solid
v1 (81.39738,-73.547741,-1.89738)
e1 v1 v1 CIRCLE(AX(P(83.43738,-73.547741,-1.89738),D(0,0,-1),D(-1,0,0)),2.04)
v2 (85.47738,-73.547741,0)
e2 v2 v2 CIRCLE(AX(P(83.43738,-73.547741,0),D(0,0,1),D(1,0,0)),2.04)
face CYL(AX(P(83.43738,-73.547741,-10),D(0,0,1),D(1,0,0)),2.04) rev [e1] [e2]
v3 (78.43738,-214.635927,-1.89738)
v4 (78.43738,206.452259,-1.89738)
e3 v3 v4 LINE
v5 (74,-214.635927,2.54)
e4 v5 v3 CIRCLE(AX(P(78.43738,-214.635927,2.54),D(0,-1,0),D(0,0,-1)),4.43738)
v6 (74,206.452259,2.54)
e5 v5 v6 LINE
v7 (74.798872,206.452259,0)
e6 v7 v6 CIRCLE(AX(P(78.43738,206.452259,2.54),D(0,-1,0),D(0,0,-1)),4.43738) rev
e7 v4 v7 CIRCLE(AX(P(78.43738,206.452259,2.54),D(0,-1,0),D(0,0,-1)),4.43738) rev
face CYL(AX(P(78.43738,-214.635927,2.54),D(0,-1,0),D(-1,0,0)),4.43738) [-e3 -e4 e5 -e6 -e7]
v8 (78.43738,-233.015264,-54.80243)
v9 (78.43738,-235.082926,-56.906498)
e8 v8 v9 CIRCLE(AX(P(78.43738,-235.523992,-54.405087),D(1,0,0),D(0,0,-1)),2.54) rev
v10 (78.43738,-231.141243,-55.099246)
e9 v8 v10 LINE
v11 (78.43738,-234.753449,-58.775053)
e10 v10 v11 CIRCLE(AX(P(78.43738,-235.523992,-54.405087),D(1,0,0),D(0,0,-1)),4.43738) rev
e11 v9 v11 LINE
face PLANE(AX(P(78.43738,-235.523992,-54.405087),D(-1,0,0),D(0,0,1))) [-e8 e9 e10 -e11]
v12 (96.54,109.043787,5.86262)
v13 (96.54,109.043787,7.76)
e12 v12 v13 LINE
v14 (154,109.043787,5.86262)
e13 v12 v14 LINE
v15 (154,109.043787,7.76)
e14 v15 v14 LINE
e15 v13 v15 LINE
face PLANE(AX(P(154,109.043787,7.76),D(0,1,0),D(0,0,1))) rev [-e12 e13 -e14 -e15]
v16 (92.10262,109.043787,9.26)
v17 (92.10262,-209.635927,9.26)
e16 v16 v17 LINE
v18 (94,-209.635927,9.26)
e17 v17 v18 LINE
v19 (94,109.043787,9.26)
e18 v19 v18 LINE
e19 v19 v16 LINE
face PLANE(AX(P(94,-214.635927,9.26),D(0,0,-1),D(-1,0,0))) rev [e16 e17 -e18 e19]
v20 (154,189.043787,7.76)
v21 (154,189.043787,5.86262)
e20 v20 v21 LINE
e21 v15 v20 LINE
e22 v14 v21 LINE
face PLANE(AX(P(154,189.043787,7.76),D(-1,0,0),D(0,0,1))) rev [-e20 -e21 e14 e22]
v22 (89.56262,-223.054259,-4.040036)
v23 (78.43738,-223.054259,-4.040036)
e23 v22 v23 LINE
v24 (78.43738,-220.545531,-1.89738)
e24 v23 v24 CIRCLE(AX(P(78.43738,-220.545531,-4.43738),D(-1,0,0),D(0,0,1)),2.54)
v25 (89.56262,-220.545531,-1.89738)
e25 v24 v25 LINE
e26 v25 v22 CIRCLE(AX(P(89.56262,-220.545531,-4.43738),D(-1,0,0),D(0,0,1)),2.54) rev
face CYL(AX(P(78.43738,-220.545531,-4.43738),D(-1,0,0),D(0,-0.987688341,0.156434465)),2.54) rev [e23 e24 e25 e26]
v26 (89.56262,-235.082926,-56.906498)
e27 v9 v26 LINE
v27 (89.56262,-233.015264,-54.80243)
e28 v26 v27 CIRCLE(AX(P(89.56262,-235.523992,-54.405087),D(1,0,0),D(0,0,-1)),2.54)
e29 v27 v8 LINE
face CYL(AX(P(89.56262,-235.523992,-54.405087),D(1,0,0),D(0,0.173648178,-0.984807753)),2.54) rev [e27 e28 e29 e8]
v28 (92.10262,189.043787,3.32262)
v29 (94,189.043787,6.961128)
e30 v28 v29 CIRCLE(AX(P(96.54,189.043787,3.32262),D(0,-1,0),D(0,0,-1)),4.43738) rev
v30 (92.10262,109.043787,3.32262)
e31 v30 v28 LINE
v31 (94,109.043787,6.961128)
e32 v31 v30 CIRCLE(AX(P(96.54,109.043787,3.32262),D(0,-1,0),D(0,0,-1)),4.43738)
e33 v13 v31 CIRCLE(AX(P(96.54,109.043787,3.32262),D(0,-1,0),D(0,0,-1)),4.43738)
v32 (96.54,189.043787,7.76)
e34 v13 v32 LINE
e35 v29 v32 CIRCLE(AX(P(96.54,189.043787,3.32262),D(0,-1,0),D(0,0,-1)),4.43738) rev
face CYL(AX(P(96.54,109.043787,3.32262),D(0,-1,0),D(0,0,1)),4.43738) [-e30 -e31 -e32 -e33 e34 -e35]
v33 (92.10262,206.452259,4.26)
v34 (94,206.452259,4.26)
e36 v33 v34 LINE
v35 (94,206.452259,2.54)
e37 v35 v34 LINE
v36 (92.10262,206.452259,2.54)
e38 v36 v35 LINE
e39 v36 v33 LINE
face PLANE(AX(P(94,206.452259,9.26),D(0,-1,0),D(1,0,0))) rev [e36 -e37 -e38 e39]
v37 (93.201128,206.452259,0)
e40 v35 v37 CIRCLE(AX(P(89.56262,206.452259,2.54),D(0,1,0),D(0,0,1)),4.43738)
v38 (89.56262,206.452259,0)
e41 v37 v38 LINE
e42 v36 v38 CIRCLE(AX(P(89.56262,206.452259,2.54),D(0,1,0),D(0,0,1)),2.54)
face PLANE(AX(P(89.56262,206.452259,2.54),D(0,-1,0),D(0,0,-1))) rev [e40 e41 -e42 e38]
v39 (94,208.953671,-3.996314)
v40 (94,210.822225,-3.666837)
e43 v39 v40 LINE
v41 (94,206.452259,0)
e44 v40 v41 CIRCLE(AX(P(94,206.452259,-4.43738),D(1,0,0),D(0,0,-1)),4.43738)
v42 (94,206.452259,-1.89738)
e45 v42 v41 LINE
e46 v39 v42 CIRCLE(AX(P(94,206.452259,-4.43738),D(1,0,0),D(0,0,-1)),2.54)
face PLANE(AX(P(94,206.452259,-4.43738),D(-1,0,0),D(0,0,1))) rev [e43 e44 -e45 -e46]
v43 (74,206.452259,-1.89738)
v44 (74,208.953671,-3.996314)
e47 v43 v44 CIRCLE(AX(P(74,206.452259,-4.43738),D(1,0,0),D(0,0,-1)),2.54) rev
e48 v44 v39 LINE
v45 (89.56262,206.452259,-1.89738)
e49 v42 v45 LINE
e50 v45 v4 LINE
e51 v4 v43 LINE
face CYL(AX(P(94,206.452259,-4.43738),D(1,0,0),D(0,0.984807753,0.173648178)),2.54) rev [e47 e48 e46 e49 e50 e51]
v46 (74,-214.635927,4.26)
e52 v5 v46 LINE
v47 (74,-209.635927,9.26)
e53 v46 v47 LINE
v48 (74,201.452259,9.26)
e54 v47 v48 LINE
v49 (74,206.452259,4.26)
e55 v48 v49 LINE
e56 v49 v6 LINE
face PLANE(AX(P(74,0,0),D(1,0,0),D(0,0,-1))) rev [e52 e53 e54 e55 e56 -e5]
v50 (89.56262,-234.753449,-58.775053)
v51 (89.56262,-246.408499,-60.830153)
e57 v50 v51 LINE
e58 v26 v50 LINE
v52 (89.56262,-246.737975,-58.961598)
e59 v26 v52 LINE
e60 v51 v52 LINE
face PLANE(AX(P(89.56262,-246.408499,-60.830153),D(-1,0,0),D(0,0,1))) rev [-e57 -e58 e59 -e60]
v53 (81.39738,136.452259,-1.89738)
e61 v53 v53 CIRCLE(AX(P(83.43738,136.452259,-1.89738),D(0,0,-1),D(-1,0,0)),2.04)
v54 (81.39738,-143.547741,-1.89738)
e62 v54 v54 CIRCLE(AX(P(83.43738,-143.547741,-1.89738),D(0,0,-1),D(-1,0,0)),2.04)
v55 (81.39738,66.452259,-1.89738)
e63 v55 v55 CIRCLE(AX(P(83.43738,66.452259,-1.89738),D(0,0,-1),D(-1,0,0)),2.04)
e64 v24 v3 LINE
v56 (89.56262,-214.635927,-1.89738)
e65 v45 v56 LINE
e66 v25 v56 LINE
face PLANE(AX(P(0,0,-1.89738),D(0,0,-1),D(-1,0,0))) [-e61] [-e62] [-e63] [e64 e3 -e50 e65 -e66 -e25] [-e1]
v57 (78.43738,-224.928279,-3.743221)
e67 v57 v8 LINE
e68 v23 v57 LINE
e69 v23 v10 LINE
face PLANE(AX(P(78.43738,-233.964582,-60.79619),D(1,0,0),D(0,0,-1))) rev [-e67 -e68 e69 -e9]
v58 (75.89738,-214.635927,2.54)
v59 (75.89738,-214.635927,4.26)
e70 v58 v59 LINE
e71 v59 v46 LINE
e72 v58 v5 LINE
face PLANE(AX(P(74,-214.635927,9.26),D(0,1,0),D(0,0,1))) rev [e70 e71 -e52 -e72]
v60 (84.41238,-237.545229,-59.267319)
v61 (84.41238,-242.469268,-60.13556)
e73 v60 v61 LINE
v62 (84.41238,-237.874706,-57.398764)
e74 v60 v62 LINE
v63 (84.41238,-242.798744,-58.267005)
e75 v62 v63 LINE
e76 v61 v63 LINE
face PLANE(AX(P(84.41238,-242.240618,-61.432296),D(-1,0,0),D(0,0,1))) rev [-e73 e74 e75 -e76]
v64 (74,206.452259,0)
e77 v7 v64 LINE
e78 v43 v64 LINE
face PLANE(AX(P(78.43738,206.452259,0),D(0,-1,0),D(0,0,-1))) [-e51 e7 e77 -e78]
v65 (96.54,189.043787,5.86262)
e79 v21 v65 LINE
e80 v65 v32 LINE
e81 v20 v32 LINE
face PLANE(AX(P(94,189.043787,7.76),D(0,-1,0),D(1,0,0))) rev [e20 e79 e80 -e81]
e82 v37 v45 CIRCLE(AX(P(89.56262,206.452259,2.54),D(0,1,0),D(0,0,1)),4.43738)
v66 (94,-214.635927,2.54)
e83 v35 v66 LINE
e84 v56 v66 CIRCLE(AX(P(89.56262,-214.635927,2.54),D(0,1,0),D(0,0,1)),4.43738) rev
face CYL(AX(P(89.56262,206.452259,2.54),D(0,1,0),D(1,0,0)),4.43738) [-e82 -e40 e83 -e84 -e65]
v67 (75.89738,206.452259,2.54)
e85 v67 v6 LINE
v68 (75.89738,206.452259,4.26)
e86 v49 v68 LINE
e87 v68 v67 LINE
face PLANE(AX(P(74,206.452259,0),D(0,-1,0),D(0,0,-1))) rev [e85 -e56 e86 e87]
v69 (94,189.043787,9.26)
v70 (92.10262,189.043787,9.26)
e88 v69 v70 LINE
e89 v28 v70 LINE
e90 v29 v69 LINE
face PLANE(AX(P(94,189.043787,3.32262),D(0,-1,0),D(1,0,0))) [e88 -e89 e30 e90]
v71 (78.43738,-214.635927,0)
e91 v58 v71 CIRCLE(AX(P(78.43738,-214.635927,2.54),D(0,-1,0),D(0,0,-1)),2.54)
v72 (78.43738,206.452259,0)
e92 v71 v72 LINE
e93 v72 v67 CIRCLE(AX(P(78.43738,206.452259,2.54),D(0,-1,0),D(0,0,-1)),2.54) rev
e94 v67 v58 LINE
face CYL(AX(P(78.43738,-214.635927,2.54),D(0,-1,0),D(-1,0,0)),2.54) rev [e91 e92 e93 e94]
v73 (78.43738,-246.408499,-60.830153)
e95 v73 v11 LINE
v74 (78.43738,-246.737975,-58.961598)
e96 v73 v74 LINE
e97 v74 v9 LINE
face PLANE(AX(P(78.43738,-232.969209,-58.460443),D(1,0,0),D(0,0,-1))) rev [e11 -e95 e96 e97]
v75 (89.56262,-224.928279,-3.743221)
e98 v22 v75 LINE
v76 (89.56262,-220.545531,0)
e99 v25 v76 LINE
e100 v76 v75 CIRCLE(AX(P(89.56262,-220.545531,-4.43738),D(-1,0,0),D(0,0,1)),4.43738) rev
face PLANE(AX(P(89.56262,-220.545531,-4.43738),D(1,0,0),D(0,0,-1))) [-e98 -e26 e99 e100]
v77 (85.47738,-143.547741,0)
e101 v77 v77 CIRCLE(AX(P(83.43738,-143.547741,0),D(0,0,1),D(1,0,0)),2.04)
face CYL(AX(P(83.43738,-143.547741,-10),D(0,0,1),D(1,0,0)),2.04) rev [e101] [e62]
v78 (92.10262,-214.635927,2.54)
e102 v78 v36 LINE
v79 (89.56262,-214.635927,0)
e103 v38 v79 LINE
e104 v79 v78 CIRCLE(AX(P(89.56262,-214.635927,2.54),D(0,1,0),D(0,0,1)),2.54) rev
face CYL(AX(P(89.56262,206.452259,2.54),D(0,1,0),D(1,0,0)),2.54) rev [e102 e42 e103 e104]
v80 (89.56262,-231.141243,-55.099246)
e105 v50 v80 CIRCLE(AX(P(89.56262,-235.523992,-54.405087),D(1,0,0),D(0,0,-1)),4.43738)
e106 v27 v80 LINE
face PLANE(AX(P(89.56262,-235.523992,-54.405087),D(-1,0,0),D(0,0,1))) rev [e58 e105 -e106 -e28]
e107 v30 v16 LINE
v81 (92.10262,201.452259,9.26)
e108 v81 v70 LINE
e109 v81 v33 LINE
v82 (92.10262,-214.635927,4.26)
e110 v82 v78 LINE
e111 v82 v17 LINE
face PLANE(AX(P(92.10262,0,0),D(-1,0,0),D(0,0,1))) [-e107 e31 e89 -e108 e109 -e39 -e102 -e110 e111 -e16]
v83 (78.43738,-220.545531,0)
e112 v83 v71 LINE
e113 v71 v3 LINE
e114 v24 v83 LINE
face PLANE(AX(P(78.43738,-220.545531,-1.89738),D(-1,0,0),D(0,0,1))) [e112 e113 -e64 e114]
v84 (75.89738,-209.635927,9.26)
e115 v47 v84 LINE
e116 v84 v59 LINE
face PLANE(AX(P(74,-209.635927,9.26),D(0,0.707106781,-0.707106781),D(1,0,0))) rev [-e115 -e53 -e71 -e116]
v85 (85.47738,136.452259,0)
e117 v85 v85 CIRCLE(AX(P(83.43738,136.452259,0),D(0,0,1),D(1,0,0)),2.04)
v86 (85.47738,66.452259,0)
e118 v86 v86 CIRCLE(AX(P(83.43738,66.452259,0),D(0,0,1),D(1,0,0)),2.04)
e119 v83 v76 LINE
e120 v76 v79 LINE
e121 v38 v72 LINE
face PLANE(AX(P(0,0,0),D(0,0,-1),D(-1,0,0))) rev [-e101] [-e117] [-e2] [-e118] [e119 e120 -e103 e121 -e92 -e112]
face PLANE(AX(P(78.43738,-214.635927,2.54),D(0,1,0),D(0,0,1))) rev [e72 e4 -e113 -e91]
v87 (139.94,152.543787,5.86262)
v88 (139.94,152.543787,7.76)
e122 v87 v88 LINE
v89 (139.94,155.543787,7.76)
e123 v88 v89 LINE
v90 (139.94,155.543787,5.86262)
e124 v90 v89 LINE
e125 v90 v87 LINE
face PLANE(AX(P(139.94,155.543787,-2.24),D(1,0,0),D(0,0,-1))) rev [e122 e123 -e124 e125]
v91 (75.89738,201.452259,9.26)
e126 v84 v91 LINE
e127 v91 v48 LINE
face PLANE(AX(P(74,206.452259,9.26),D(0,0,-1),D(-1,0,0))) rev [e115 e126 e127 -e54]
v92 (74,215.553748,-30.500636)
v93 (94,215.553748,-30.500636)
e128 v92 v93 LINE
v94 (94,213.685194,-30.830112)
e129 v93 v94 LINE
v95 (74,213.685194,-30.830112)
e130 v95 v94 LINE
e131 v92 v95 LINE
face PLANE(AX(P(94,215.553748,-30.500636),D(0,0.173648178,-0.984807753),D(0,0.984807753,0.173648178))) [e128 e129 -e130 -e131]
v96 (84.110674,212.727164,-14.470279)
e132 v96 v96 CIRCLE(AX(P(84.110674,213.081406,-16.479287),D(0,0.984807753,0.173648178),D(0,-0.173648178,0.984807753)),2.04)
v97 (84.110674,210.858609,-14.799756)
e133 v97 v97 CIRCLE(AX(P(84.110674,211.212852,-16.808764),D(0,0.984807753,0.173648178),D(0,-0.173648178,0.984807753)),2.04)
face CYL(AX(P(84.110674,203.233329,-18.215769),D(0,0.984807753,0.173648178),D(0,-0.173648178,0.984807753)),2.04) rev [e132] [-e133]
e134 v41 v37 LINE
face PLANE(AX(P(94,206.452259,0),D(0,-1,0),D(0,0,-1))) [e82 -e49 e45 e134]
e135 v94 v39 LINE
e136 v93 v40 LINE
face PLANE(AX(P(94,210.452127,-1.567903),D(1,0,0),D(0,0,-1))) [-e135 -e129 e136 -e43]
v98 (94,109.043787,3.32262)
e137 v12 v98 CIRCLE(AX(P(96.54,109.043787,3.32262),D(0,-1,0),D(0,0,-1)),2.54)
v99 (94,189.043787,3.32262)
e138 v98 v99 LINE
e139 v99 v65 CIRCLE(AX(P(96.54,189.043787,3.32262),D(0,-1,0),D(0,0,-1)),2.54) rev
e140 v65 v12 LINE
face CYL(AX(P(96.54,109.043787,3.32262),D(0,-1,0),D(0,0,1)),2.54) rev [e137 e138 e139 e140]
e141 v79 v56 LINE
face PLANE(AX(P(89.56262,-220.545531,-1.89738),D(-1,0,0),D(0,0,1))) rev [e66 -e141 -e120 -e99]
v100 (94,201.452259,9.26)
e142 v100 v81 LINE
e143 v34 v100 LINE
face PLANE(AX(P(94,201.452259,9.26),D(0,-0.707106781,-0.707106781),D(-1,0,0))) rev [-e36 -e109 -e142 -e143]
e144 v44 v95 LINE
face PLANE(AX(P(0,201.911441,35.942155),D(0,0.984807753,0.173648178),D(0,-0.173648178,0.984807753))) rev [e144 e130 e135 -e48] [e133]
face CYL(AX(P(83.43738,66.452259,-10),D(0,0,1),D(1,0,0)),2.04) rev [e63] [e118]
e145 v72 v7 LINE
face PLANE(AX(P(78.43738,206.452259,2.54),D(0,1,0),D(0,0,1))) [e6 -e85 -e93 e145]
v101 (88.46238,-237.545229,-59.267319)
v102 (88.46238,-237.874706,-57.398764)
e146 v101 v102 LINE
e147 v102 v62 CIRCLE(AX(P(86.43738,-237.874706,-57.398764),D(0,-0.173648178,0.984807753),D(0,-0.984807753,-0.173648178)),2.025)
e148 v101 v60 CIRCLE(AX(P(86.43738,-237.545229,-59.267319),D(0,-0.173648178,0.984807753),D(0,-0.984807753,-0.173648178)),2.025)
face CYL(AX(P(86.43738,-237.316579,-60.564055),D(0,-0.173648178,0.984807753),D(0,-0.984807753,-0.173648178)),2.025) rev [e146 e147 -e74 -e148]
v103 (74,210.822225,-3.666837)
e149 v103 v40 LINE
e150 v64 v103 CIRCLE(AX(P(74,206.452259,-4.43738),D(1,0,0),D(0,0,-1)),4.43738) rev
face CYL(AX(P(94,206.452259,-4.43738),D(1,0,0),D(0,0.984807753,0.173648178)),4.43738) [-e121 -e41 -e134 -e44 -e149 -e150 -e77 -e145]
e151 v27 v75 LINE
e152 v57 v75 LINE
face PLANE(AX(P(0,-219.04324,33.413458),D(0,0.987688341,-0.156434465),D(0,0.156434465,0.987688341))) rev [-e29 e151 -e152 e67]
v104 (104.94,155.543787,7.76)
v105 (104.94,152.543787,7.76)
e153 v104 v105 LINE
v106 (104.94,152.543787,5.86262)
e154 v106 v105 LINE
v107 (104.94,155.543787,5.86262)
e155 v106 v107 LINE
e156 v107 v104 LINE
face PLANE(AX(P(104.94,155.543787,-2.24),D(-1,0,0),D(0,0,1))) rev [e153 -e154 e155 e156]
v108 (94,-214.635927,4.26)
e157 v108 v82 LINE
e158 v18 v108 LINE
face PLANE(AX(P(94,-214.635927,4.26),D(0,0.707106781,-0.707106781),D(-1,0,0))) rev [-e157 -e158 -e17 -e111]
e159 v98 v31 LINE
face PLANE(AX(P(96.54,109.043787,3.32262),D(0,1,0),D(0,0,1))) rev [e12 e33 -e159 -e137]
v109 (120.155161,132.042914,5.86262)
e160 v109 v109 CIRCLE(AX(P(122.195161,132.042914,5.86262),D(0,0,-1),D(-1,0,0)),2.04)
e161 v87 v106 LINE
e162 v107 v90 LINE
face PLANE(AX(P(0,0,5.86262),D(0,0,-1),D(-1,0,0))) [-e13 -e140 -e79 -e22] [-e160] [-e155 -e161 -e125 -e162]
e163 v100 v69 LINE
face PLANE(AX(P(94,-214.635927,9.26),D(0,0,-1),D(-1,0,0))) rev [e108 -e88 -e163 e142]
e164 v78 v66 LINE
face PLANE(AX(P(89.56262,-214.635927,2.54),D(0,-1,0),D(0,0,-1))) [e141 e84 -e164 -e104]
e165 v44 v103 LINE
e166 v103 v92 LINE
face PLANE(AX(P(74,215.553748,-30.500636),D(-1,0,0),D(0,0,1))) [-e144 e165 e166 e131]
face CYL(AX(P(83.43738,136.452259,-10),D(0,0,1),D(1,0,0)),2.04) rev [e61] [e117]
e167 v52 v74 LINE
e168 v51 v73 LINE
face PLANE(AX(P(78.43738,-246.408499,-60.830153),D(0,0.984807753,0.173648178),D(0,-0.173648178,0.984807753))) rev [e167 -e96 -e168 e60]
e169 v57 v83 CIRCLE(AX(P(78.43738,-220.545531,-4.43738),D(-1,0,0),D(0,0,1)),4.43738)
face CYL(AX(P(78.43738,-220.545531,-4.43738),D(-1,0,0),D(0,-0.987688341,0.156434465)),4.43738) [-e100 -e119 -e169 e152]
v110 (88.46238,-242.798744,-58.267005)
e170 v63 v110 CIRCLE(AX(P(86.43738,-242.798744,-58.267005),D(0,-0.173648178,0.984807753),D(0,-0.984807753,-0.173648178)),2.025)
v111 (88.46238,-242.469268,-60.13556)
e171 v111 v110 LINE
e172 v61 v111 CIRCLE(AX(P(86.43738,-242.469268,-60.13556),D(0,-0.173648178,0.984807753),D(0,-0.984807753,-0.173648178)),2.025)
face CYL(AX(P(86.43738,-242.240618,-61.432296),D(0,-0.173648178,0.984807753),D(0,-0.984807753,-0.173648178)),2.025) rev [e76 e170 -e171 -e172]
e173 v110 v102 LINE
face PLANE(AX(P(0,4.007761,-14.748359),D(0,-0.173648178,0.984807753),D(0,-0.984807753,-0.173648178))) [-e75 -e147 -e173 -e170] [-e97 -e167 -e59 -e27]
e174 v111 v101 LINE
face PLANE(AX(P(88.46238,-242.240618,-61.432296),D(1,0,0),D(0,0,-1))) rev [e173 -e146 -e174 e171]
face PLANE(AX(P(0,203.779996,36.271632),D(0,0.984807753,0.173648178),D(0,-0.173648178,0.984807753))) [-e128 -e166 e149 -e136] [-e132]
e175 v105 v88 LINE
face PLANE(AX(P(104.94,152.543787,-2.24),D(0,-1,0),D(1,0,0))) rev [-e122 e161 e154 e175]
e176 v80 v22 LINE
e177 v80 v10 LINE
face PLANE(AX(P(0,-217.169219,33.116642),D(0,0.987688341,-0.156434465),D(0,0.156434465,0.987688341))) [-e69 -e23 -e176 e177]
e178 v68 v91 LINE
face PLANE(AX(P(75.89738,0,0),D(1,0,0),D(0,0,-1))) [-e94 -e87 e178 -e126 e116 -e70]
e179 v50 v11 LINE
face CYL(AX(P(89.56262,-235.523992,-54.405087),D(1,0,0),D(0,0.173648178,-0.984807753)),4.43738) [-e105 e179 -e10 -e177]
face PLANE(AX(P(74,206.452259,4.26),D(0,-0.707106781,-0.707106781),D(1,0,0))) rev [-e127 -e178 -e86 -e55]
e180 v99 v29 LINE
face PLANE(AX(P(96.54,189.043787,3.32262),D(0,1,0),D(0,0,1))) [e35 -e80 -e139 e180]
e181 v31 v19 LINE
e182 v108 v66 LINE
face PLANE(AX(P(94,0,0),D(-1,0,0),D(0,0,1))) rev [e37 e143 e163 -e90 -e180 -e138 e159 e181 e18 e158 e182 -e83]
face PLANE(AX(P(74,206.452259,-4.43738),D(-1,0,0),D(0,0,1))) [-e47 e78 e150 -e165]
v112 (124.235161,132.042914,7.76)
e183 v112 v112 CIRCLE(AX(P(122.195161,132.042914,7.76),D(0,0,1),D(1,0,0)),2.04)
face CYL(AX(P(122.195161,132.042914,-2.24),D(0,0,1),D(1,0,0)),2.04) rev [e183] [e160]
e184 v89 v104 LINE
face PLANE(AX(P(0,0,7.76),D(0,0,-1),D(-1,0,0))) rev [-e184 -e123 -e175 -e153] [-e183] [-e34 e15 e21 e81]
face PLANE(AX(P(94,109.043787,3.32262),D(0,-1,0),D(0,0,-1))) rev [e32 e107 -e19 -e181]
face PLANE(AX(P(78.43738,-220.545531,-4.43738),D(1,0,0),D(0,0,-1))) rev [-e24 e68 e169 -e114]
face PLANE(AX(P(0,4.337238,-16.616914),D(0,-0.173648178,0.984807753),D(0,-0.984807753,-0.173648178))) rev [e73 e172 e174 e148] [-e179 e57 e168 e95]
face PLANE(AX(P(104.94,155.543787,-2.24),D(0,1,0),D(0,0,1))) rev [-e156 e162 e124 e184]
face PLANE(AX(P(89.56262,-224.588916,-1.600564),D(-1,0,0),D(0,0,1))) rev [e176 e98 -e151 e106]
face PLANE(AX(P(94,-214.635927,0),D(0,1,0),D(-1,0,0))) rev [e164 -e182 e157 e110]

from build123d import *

# Parameters (mm, degrees)
SKETCH1_W                      = 20
SKETCH1_H                      = 425.14614931
BASE_FLANGE1_DEPTH             = 1.89738
EDGE_FLANGE1_START             = 74
EDGE_FLANGE1_DEPTH             = 20
EDGE_FLANGE1_2_DEPTH           = 20
EDGE_FLANGE3_STRIP_W           = 12.66952
EDGE_FLANGE3_STRIP_H           = 1.89738
EDGE_FLANGE3_STRIP_CUT_DEPTH   = 421.088186102
EDGE_FLANGE3_STRIP_2_W         = 12.66952
EDGE_FLANGE3_STRIP_2_H         = 1.89738
EDGE_FLANGE3_STRIP_CUT_2_DEPTH = 421.088186102
EDGE_FLANGE3_DEPTH             = 421.088186102
EDGE_FLANGE3_BEND_DEPTH        = 421.088186102
EDGE_FLANGE5_START             = 78.43738
EDGE_FLANGE5_DEPTH             = 11.12524
EDGE_FLANGE6_START             = 78.43738
EDGE_FLANGE6_DEPTH             = 11.12524
EDGE_FLANGE6_2_DEPTH           = 11.12524
SKETCH31_R                     = 2.04
CUT_EXTRUDE1_DEPTH             = 10
CUT_EXTRUDE2_DEPTH             = 3.21412
BREAK_CORNER1_START            = 74
BREAK_CORNER1_DEPTH            = 20
EDGE_FLANGE7_STRIP_W           = 14.16952
EDGE_FLANGE7_STRIP_H           = 1.89738
EDGE_FLANGE7_STRIP_CUT_DEPTH   = 80
EDGE_FLANGE7_DEPTH             = 80
SKETCH36_W                     = 35
SKETCH36_H                     = 3
CUT_EXTRUDE3_DEPTH             = 10
SKETCH37_R                     = 2.04
CUT_EXTRUDE4_DEPTH             = 10
SKETCH38_R                     = 2.04
CUT_EXTRUDE6_DEPTH             = 10


# Read off the part's stored shape, not the designer's step: Edge-Flange1, Edge-Flange5, Edge-Flange6, Break-Corner1
# Sheet-metal steps are written as plain solids
with BuildPart() as part:
    # Sketch1 → Base-Flange1 (new body)
    with BuildSketch(Plane.XY):
        with Locations((84, -2.062852184)):
            Rectangle(SKETCH1_W, SKETCH1_H)
    extrude(amount=-BASE_FLANGE1_DEPTH)

    # Edge-Flange1 outline → Edge-Flange1 (cut)
    with BuildSketch(Plane.YZ.offset(EDGE_FLANGE1_START)):
        with BuildLine():
            ThreePointArc((206.452259263, 0), (208.504014129, -0.502835143), (210.090767372, -1.89738))
            Line((210.090767372, -1.89738), (210.510222471, -1.89738))
            Line((210.510222471, -1.89738), (210.510222471, 0))
            Line((210.510222471, 0), (206.452259263, 0))
        make_face()
    extrude(amount=EDGE_FLANGE1_DEPTH, mode=Mode.SUBTRACT)

    # Edge-Flange1 2 outline → Edge-Flange1 2 (add)
    with BuildSketch(Plane.YZ.offset(EDGE_FLANGE1_START)):
        with BuildLine():
            Line((215.55374818, -30.500635662), (210.82222549, -3.666837049))
            ThreePointArc((210.82222549, -3.666837049), (210.553071361, -2.742186382), (210.090767372, -1.89738))
            Line((210.090767372, -1.89738), (206.452259263, -1.89738))
            ThreePointArc((206.452259263, -1.89738), (208.084939792, -2.491627114), (208.953670956, -3.996313629))
            Line((208.953670956, -3.996313629), (213.685193646, -30.830112242))
            Line((213.685193646, -30.830112242), (215.55374818, -30.500635662))
        make_face()
    extrude(amount=EDGE_FLANGE1_2_DEPTH)

    # Edge-Flange3 strip (across the edge) → Edge-Flange3 strip cut (cut)
    with BuildSketch(Plane(origin=(74, 206.452259263, 0), x_dir=(1, 0, 0), z_dir=(0, -1, 0))):
        with Locations((-1.89738, -0.94869)):
            Rectangle(EDGE_FLANGE3_STRIP_W, EDGE_FLANGE3_STRIP_H)
    extrude(amount=EDGE_FLANGE3_STRIP_CUT_DEPTH, mode=Mode.SUBTRACT)

    # Edge-Flange3 strip 2 (across the edge) → Edge-Flange3 strip cut 2 (cut)
    with BuildSketch(Plane(origin=(94, -214.635926839, 0), x_dir=(-1, 0, 0), z_dir=(0, 1, 0))):
        with Locations((-1.89738, -0.94869)):
            Rectangle(EDGE_FLANGE3_STRIP_2_W, EDGE_FLANGE3_STRIP_2_H)
    extrude(amount=EDGE_FLANGE3_STRIP_CUT_2_DEPTH, mode=Mode.SUBTRACT)

    # Edge-Flange3 section (across the edge) → Edge-Flange3 (add)
    with BuildSketch(Plane(origin=(74, 206.452259263, 0), x_dir=(1, 0, 0), z_dir=(0, -1, 0))):
        with BuildLine():
            Line((0, 2.54), (0, 9.26))
            Line((0, 9.26), (1.89738, 9.26))
            Line((1.89738, 9.26), (1.89738, 2.54))
            ThreePointArc((1.89738, 2.54), (2.641328776, 0.743948776), (4.43738, 0))
            Line((4.43738, 0), (4.43738, -1.89738))
            ThreePointArc((4.43738, -1.89738), (1.299678511, -0.597701489), (0, 2.54))
        make_face()
    extrude(amount=EDGE_FLANGE3_DEPTH)

    # Edge-Flange3 section 2 (across the edge) → Edge-Flange3 bend (add)
    with BuildSketch(Plane(origin=(94, -214.635926839, 0), x_dir=(-1, 0, 0), z_dir=(0, 1, 0))):
        with BuildLine():
            Line((0, 2.54), (0, 9.26))
            Line((0, 9.26), (1.89738, 9.26))
            Line((1.89738, 9.26), (1.89738, 2.54))
            ThreePointArc((1.89738, 2.54), (2.641328776, 0.743948776), (4.43738, 0))
            Line((4.43738, 0), (4.43738, -1.89738))
            ThreePointArc((4.43738, -1.89738), (1.299678511, -0.597701489), (0, 2.54))
        make_face()
    extrude(amount=EDGE_FLANGE3_BEND_DEPTH)

    # Edge-Flange5 outline → Edge-Flange5 (add)
    with BuildSketch(Plane.YZ.offset(EDGE_FLANGE5_START)):
        with BuildLine():
            ThreePointArc((-220.545530818, 0), (-223.427378599, -1.063169777), (-224.928279306, -3.743220834))
            Line((-224.928279306, -3.743220834), (-233.964581883, -60.796189915))
            Line((-233.964581883, -60.796189915), (-232.090561779, -61.09300554))
            Line((-232.090561779, -61.09300554), (-223.054259203, -4.040036459))
            ThreePointArc((-223.054259203, -4.040036459), (-222.195128861, -2.505948848), (-220.545530818, -1.89738))
            Line((-220.545530818, -1.89738), (-214.635926839, -1.89738))
            Line((-214.635926839, -1.89738), (-214.635926839, 0))
            Line((-214.635926839, 0), (-220.545530818, 0))
        make_face()
    extrude(amount=EDGE_FLANGE5_DEPTH)

    # Edge-Flange6 outline → Edge-Flange6 (cut)
    with BuildSketch(Plane.YZ.offset(EDGE_FLANGE6_START)):
        with BuildLine():
            ThreePointArc((-231.141243496, -55.099245789), (-231.958853079, -57.047079402), (-233.584451669, -58.3961422))
            Line((-233.584451669, -58.3961422), (-233.964581883, -60.796189915))
            Line((-233.964581883, -60.796189915), (-232.090561779, -61.09300554))
            Line((-232.090561779, -61.09300554), (-231.141243496, -55.099245789))
        make_face()
    extrude(amount=EDGE_FLANGE6_DEPTH, mode=Mode.SUBTRACT)

    # Edge-Flange6 2 outline → Edge-Flange6 2 (add)
    with BuildSketch(Plane.YZ.offset(EDGE_FLANGE6_START)):
        with BuildLine():
            Line((-246.408498712, -60.830152569), (-234.753449034, -58.775052849))
            ThreePointArc((-234.753449034, -58.775052849), (-234.155770092, -58.626260643), (-233.584451669, -58.3961422))
            Line((-233.584451669, -58.3961422), (-233.015263599, -54.802430164))
            ThreePointArc((-233.015263599, -54.802430164), (-233.712335844, -56.185396154), (-235.082925613, -56.906498315))
            Line((-235.082925613, -56.906498315), (-246.737975292, -58.961598035))
            Line((-246.737975292, -58.961598035), (-246.408498712, -60.830152569))
        make_face()
    extrude(amount=EDGE_FLANGE6_2_DEPTH)

    # Sketch31 → Cut-Extrude1 (cut)
    with BuildSketch(Plane(origin=(0, 203.838091474, 35.942155223), x_dir=(1, 0, 0), z_dir=(0, 0.9848077530122075, 0.17364817766693413))):
        with Locations(Location((84.110673768, 53.230127546, 0), (0, 0, 270))):
            Circle(SKETCH31_R)
    extrude(amount=-CUT_EXTRUDE1_DEPTH, mode=Mode.SUBTRACT)

    # Sketch32 → Cut-Extrude2 (cut)
    with BuildSketch(Plane(origin=(0, 2.642966784, -14.989009472), x_dir=(1, 0, 0), z_dir=(0, -0.17364817766693053, 0.984807753012208))):
        with BuildLine():
            Line((84.41238, -249.228045081), (84.41238, -244.228045081))
            ThreePointArc((84.41238, -244.228045081), (86.43738, -242.203045081), (88.46238, -244.228045081))
            Line((88.46238, -244.228045081), (88.46238, -249.228045081))
            ThreePointArc((88.46238, -249.228045081), (86.43738, -251.253045081), (84.41238, -249.228045081))
        make_face()
    extrude(amount=-CUT_EXTRUDE2_DEPTH, mode=Mode.SUBTRACT)

    # Break-Corner1 outline → Break-Corner1 (cut)
    with BuildSketch(Plane.YZ.offset(BREAK_CORNER1_START)):
        Polygon((-214.635926839, 9.26), (-214.635926839, 4.26), (-209.635926839, 9.26), align=None)
        Polygon((206.452259263, 9.26), (201.452259263, 9.26), (206.452259263, 4.26), align=None)
    extrude(amount=BREAK_CORNER1_DEPTH, mode=Mode.SUBTRACT)

    # Edge-Flange7 strip (across the edge) → Edge-Flange7 strip cut (cut)
    with BuildSketch(Plane(origin=(94, 189.043786616, 7.76), x_dir=(0, 0, -1), z_dir=(0, -1, 0))):
        with Locations((-2.64738, -0.94869)):
            Rectangle(EDGE_FLANGE7_STRIP_W, EDGE_FLANGE7_STRIP_H)
    extrude(amount=EDGE_FLANGE7_STRIP_CUT_DEPTH, mode=Mode.SUBTRACT)

    # Edge-Flange7 section (across the edge) → Edge-Flange7 (add)
    with BuildSketch(Plane(origin=(94, 189.043786616, 7.76), x_dir=(0, 0, -1), z_dir=(0, -1, 0))):
        with BuildLine():
            Line((0, 2.54), (0, 60))
            Line((0, 60), (1.89738, 60))
            Line((1.89738, 60), (1.89738, 2.54))
            ThreePointArc((1.89738, 2.54), (2.641328776, 0.743948776), (4.43738, 0))
            Line((4.43738, 0), (4.43738, -1.89738))
            ThreePointArc((4.43738, -1.89738), (1.299678511, -0.597701489), (0, 2.54))
        make_face()
    extrude(amount=EDGE_FLANGE7_DEPTH)

    # Sketch36 → Cut-Extrude3 (cut)
    with BuildSketch(Plane.XY.offset(7.76)):
        with Locations((122.44, 154.043786616)):
            Rectangle(SKETCH36_W, SKETCH36_H)
    extrude(amount=-CUT_EXTRUDE3_DEPTH, mode=Mode.SUBTRACT)

    # Sketch37 → Cut-Extrude4 (cut)
    with BuildSketch(Plane.XY):
        with Locations((83.43738, 136.452259263)):
            Circle(SKETCH37_R)
        with Locations((83.43738, 66.452259263)):
            Circle(SKETCH37_R)
        with Locations((83.43738, -73.547740737)):
            Circle(SKETCH37_R)
        with Locations((83.43738, -143.547740737)):
            Circle(SKETCH37_R)
    extrude(amount=-CUT_EXTRUDE4_DEPTH, mode=Mode.SUBTRACT)

    # Sketch38 → Cut-Extrude6 (cut)
    with BuildSketch(Plane.XY.offset(7.76)):
        with Locations((122.195161073, 132.04291448)):
            Circle(SKETCH38_R)
    extrude(amount=-CUT_EXTRUDE6_DEPTH, mode=Mode.SUBTRACT)


solid = part.part
